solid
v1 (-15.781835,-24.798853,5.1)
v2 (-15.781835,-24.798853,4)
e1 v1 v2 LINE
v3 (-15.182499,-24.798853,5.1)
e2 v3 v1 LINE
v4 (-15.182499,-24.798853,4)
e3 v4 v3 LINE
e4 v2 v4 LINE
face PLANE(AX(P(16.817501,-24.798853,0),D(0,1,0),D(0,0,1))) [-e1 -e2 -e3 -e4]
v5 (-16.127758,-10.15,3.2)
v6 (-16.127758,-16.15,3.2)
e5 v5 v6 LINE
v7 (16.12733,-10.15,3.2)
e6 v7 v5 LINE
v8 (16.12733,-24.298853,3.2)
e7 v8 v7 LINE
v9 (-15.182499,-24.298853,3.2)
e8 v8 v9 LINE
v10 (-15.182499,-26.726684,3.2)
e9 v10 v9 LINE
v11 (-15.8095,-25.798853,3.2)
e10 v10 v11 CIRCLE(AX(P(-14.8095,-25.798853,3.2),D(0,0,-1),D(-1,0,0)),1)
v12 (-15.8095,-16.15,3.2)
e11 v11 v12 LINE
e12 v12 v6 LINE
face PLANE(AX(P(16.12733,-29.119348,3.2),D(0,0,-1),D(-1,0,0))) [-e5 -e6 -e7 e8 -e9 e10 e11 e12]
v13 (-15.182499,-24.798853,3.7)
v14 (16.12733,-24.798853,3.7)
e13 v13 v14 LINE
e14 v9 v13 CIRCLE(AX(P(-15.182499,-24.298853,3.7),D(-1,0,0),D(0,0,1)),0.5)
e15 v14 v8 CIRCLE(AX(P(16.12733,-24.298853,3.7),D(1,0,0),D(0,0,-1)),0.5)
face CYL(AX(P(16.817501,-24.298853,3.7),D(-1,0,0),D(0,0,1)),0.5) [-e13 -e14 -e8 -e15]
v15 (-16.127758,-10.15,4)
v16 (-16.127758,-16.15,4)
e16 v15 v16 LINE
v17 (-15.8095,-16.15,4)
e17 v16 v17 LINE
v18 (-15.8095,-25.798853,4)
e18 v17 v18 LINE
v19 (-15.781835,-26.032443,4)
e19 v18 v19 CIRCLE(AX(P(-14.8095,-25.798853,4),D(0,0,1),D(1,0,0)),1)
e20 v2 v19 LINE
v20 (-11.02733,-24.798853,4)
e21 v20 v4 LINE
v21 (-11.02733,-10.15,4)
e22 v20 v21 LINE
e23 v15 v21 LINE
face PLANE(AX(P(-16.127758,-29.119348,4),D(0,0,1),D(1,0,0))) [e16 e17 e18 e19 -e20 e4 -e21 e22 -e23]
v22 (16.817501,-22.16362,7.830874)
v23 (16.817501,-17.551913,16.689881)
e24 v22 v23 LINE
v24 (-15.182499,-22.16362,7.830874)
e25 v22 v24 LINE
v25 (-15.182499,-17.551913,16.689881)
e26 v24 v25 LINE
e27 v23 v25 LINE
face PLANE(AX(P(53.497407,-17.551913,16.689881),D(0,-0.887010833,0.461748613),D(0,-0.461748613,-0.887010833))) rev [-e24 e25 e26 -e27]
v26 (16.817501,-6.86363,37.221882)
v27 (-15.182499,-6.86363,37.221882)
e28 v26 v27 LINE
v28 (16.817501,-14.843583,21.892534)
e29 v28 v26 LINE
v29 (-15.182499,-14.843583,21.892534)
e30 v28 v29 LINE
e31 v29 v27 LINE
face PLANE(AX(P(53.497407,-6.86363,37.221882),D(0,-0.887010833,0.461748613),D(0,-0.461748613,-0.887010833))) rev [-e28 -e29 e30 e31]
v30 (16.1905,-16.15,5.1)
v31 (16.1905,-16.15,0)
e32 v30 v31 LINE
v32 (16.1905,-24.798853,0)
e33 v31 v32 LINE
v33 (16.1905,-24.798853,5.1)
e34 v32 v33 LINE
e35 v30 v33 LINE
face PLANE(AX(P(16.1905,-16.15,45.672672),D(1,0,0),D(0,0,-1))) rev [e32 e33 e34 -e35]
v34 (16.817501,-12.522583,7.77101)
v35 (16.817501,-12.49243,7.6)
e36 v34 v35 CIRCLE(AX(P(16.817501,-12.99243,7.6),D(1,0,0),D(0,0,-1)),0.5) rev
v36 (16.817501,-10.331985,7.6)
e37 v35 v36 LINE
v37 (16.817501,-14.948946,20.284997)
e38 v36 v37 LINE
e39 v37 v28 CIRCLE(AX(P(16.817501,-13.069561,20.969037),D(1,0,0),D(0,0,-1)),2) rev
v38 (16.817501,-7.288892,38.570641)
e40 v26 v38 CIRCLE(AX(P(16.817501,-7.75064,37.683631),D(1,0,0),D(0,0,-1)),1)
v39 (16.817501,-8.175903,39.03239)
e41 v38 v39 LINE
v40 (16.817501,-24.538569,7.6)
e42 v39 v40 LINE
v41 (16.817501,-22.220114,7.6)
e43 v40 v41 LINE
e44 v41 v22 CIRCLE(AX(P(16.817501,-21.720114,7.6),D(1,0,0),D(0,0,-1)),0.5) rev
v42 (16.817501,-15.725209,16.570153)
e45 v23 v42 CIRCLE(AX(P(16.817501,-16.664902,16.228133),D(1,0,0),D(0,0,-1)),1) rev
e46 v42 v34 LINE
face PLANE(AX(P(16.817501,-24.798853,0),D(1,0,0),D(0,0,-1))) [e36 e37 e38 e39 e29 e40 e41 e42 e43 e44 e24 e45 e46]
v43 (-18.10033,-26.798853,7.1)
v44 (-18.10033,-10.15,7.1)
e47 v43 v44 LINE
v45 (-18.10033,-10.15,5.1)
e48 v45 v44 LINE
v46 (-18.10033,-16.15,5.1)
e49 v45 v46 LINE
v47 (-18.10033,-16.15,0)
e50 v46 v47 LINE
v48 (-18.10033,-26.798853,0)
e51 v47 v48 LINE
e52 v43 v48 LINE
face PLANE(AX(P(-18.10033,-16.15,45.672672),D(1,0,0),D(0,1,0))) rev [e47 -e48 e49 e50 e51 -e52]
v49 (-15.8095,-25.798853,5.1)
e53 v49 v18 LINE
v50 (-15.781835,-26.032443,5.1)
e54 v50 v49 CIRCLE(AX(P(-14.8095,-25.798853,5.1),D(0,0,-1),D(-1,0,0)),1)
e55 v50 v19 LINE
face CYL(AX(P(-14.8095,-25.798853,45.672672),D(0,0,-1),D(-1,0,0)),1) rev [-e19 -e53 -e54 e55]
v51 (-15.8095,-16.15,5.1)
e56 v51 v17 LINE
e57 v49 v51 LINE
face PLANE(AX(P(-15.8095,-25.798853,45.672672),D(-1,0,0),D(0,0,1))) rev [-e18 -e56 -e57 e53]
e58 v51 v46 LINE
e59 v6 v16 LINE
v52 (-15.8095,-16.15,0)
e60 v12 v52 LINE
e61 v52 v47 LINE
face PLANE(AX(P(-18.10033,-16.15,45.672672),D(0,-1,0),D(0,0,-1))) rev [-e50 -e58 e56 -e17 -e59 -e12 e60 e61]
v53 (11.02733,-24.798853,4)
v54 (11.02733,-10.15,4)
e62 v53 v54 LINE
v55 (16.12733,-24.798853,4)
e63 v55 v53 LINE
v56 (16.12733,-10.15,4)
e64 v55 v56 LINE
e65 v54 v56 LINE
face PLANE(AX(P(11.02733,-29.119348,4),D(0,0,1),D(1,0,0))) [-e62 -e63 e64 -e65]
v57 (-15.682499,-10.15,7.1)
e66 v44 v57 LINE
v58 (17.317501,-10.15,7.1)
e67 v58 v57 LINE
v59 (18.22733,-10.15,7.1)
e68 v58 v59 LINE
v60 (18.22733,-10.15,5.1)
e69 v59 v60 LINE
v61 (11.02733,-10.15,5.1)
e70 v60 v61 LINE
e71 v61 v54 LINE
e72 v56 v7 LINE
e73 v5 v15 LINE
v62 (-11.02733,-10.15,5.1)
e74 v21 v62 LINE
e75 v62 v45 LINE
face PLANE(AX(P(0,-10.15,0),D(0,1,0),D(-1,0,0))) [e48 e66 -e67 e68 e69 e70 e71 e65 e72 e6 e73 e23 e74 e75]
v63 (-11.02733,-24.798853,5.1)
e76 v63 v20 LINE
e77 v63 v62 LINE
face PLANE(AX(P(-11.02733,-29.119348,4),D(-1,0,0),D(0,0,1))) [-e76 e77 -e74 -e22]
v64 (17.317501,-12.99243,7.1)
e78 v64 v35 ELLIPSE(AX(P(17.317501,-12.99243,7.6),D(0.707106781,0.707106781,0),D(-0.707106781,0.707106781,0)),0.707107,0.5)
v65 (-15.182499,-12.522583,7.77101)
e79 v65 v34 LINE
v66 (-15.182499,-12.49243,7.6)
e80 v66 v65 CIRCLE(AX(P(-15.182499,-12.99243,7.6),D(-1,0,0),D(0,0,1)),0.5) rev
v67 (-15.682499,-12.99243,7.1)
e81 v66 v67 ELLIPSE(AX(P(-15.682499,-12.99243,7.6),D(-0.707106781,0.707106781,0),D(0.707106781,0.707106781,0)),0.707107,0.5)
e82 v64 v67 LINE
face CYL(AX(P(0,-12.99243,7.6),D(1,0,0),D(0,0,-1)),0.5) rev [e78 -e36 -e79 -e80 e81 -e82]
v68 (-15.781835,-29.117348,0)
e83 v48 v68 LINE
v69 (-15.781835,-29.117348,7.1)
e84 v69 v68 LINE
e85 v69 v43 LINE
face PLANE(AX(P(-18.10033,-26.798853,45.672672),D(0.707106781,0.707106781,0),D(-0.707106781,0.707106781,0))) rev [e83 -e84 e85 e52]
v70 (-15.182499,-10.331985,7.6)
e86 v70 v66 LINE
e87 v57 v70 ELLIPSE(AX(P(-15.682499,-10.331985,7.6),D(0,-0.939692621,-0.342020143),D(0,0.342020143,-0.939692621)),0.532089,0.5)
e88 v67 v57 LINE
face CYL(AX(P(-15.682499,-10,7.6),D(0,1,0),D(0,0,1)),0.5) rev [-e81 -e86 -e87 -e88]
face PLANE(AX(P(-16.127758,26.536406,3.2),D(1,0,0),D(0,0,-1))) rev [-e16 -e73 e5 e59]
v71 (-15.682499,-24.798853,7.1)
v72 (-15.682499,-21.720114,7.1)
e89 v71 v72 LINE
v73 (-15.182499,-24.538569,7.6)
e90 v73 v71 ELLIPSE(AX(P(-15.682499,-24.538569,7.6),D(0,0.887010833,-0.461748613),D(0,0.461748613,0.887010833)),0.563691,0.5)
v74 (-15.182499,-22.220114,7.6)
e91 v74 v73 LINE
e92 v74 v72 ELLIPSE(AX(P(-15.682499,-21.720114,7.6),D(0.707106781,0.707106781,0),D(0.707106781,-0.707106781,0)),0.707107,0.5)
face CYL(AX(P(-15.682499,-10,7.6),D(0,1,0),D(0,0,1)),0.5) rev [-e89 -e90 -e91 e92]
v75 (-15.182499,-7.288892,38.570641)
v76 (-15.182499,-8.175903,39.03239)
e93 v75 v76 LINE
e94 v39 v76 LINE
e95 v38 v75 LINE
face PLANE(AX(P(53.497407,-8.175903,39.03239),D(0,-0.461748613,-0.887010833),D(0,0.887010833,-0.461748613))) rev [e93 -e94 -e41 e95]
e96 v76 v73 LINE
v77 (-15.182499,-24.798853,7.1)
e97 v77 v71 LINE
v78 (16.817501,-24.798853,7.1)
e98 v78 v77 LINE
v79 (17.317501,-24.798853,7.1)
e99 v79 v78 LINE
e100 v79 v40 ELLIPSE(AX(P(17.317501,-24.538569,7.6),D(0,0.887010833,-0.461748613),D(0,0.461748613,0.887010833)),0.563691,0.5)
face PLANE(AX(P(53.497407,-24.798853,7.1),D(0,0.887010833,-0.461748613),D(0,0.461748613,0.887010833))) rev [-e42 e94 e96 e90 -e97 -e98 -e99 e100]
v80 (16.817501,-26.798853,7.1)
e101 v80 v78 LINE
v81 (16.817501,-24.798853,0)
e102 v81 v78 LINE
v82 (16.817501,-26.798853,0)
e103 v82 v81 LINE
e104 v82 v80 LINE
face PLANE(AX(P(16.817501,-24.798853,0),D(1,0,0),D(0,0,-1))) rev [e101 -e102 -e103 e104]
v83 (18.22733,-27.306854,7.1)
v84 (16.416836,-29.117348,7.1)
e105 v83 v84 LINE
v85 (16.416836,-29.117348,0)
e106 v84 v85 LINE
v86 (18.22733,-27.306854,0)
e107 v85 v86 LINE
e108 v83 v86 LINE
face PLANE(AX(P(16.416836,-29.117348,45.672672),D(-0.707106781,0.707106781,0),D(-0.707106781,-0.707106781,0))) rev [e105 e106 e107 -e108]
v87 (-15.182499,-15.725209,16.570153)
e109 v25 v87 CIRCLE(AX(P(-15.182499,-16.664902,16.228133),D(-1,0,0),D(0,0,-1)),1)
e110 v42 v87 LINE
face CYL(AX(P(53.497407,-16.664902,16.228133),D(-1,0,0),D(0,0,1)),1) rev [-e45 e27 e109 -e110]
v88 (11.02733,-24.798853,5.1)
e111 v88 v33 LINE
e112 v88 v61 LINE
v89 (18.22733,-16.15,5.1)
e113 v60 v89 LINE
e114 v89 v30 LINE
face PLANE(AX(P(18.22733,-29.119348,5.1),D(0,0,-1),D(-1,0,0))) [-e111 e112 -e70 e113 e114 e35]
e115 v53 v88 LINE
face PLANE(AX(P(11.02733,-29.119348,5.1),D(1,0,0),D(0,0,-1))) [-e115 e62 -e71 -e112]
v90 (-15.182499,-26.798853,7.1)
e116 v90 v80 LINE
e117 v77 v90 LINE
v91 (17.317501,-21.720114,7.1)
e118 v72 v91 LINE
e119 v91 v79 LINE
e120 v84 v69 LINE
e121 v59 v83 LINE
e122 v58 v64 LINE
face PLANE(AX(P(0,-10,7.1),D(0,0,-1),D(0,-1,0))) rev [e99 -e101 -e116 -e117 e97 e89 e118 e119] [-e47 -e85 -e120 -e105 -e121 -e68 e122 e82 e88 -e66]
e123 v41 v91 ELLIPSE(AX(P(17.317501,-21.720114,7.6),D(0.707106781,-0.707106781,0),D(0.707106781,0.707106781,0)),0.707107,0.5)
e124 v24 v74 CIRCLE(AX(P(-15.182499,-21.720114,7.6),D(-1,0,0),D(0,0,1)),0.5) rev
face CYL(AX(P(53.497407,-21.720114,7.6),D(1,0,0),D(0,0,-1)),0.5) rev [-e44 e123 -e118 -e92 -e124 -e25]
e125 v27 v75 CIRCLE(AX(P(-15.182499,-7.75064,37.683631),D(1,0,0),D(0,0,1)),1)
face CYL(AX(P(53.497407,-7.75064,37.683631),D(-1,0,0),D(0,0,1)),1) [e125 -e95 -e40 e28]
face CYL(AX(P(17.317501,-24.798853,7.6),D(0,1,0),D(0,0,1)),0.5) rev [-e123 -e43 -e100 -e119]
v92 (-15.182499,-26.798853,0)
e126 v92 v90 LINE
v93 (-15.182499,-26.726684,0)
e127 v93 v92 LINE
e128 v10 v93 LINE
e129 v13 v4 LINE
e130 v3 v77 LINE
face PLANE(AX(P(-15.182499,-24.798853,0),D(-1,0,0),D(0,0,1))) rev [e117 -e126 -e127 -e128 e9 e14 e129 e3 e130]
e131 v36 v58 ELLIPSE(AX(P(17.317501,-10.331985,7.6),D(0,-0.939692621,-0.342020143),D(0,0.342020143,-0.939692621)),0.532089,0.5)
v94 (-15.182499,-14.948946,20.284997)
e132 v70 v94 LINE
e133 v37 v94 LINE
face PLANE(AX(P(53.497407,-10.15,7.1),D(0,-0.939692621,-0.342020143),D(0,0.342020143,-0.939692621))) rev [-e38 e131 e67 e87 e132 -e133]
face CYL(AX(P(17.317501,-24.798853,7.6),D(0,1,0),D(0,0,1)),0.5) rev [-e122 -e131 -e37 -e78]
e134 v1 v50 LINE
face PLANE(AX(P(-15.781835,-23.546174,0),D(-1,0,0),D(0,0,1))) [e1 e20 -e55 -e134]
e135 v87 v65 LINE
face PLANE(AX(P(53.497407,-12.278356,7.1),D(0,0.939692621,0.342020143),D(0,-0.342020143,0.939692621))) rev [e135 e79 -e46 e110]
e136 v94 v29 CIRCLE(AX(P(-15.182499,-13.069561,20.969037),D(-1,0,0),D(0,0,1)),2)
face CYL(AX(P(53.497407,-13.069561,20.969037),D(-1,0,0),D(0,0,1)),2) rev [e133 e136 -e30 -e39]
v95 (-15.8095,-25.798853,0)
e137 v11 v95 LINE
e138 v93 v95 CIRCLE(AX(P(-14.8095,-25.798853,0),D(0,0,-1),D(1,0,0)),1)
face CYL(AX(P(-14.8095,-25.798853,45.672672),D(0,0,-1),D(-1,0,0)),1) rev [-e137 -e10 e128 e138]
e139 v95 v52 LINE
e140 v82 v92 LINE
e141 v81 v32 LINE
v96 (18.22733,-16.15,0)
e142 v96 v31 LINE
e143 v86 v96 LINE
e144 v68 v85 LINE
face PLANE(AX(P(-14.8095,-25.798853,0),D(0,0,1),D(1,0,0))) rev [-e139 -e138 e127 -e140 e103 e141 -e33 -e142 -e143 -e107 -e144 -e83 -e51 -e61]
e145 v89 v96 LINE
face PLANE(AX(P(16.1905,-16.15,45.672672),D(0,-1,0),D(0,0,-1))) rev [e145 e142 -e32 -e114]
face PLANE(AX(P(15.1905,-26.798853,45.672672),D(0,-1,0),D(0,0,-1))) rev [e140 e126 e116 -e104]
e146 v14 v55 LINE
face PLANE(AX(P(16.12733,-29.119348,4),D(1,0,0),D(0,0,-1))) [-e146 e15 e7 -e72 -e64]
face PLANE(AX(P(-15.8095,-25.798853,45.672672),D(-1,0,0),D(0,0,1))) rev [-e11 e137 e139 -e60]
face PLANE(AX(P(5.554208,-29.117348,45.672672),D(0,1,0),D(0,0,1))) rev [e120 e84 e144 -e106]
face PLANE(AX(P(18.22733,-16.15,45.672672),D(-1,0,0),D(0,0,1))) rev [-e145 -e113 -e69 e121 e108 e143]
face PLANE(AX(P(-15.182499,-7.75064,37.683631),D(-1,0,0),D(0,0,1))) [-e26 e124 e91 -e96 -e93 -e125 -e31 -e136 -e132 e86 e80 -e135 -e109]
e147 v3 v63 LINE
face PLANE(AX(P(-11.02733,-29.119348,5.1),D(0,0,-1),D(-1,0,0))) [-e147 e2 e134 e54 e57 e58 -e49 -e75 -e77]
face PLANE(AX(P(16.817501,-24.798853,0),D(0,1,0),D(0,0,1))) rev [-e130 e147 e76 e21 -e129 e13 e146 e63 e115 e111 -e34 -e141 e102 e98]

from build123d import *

# Parameters (mm, degrees)
EXTRUDE_1_DEPTH             = 7.1
EXTRUDE_2_DEPTH             = 6
EXTRUDE_2_DIRECTION_2_REACH = 25.469
SKETCH_3_W                  = 32
SKETCH_3_H                  = 2
CUT_EXTRUDE_1_DEPTH         = 36.077992299
SKETCH_4_W                  = 0.599335356
SKETCH_4_H                  = 1.1
EXTRUDE_3_DEPTH             = 4.31849548
EXTRUDE_4_DEPTH             = 32
FILLET_1_R                  = 0.5


with BuildPart() as part:
    # 草图1 → 凸台-拉伸1 (new body)
    with BuildSketch(Plane.XY):
        with BuildLine():
            Line((18.227330455, -16.15), (18.227330455, -27.306853771))
            Line((18.227330455, -27.306853771), (16.416835991, -29.117348235))
            Line((16.416835991, -29.117348235), (5.554207951, -29.117348235))
            Line((5.554207951, -29.117348235), (-15.781834721, -29.117348235))
            Line((-15.781834721, -29.117348235), (-18.100330201, -26.798852755))
            Line((-18.100330201, -26.798852755), (-18.100330201, -16.15))
            Line((-18.100330201, -16.15), (-15.809499619, -16.15))
            Line((-15.809499619, -16.15), (-15.809499619, -25.798852755))
            ThreePointArc((-15.809499619, -25.798852755), (-15.5166064, -26.505959536), (-14.809499619, -26.798852755))
            Line((-14.809499619, -26.798852755), (15.190500381, -26.798852755))
            ThreePointArc((15.190500381, -26.798852755), (15.897607162, -26.505959536), (16.190500381, -25.798852755))
            Line((16.190500381, -25.798852755), (16.190500381, -16.15))
            Line((16.190500381, -16.15), (18.227330455, -16.15))
        make_face()
    extrude(amount=EXTRUDE_1_DEPTH)

    # 草图2 → 凸台-拉伸2 (add)
    with BuildSketch(Plane(origin=(0, -16.15, 0), x_dir=(1, 0, 0), z_dir=(0, 1, 0))):
        Polygon((16.127330455, -4.000000069), (16.127330455, -3.200000069), (-16.127758191, -3.200000069), (-16.127758191, -4), (-11.027330455, -4), (-11.027330455, -5.1), (-18.100330201, -5.1), (-18.100330201, -7.1), (18.227330455, -7.1), (18.227330455, -5.100000069), (11.027330455, -5.100000069), (11.027330455, -4.000000069), align=None)
    extrude(amount=EXTRUDE_2_DEPTH)

    # 草图2 → 凸台-拉伸2 direction 2 (add, up to next)
    with BuildSketch(Plane(origin=(0, -16.15, 0), x_dir=(1, 0, 0), z_dir=(0, 1, 0)), mode=Mode.PRIVATE) as extrude_2_direction_2_sk1:
        Polygon((16.127330455, -4.000000069), (16.127330455, -3.200000069), (-16.127758191, -3.200000069), (-16.127758191, -4), (-11.027330455, -4), (-11.027330455, -5.1), (-18.100330201, -5.1), (-18.100330201, -7.1), (18.227330455, -7.1), (18.227330455, -5.100000069), (11.027330455, -5.100000069), (11.027330455, -4.000000069), align=None)
    extrude_2_direction_2_tool1 = extrude(extrude_2_direction_2_sk1.sketch, amount=-EXTRUDE_2_DIRECTION_2_REACH, mode=Mode.PRIVATE) - part.part
    add(extrude_2_direction_2_tool1.solids().sort_by_distance((0.03755, -16.15, 5.267913))[0])

    # 草图3 → 切除-拉伸1 (cut, through all)
    with BuildSketch(Plane.XY.offset(7.1)):
        with Locations((0.817500635, -25.798852755)):
            Rectangle(SKETCH_3_W, SKETCH_3_H)
    extrude(amount=-CUT_EXTRUDE_1_DEPTH, mode=Mode.SUBTRACT)

    # 草图4 → 凸台-拉伸3 (add)
    with BuildSketch(Plane.XZ.offset(29.117348235)):
        with Locations((-15.482167043, 4.55)):
            Rectangle(SKETCH_4_W, SKETCH_4_H)
    extrude(amount=-EXTRUDE_3_DEPTH)

    # 草图5 → 凸台-拉伸4 (add)
    with BuildSketch(Plane(origin=(-15.182499365, 0, 0), x_dir=(0, 0, -1), z_dir=(1, 0, 0))):
        with BuildLine():
            Line((-7.1, -24.798852755), (-39.032389994, -8.175902679))
            Line((-39.032389994, -8.175902679), (-38.570641381, -7.288891846))
            ThreePointArc((-38.570641381, -7.288891846), (-37.984336348, -6.796923508), (-37.221881935, -6.863629626))
            Line((-37.221881935, -6.863629626), (-21.892534432, -14.843582842))
            ThreePointArc((-21.892534432, -14.843582842), (-21.099843464, -15.065279022), (-20.284996919, -14.948946417))
            Line((-20.284996919, -14.948946417), (-7.1, -10.15))
            Line((-7.1, -10.15), (-7.1, -12.278355545))
            Line((-7.1, -12.278355545), (-16.570152711, -15.725209246))
            ThreePointArc((-16.570152711, -15.725209246), (-17.225991491, -16.599498737), (-16.689881181, -17.5519127))
            Line((-16.689881181, -17.5519127), (-7.1, -22.544088861))
            Line((-7.1, -22.544088861), (-7.1, -24.798852755))
        make_face()
    extrude(amount=EXTRUDE_4_DEPTH)

    # 圆角1
    # the kernel refuses this fillet: 0.5 mm, written as the material it adds along each edge
    with BuildSketch(Plane(origin=(-15.182499365, -21.294088861, 7.1), x_dir=(-1, 0, 0), z_dir=(0, -1, 0))) as fillet_1_piece_1_section:
        with BuildLine():
            CenterArc((FILLET_1_R, -FILLET_1_R), FILLET_1_R, 90, 90)
            Line((0, -FILLET_1_R), (-FILLET_1_R * 0.02, -FILLET_1_R))
            Line((-FILLET_1_R * 0.02, -FILLET_1_R), (-FILLET_1_R * 0.02, FILLET_1_R * 0.02))
            Line((-FILLET_1_R * 0.02, FILLET_1_R * 0.02), (FILLET_1_R, FILLET_1_R * 0.02))
            Line((FILLET_1_R, FILLET_1_R * 0.02), (FILLET_1_R, 0))
        make_face()
    fillet_1_piece_1 = extrude(amount=4.754763894, mode=Mode.PRIVATE)
    fillet_1_piece_1 = split(fillet_1_piece_1, bisect_by=Plane(origin=(-15.182499365, -23.618510105, 7.201736565), z_dir=(-1, 0, 0)), keep=Keep.TOP, mode=Mode.PRIVATE)
    fillet_1_piece_1 = split(fillet_1_piece_1, bisect_by=Plane(origin=(-15.30597489, -24.505520938, 7.663485178), z_dir=(0, 0.8870108331782195, -0.46174861323503813)), keep=Keep.TOP, mode=Mode.PRIVATE)
    fillet_1_piece_1 = split(fillet_1_piece_1, bisect_by=Plane(origin=(-15.30597489, -22.731499272, 6.739987952), z_dir=(0, -0.8870108331782195, 0.4617486132350387)), keep=Keep.TOP, mode=Mode.PRIVATE)
    add(fillet_1_piece_1)
    with BuildSketch(Plane(origin=(-15.182499365, -22.544088861, 7.1), x_dir=(0, 1, 0), z_dir=(1, 0, 0))) as fillet_1_piece_2:
        with BuildLine():
            CenterArc((FILLET_1_R * 1.64794899742, FILLET_1_R), FILLET_1_R, 152.5, 117.5)
            Line((FILLET_1_R * 0.76093816424, FILLET_1_R * 1.46174861324), (FILLET_1_R * 0.743197947576, FILLET_1_R * 1.4709835855))
            Line((FILLET_1_R * 0.743197947576, FILLET_1_R * 1.4709835855), (-FILLET_1_R * 0.0329589799484, -FILLET_1_R * 0.02))
            Line((-FILLET_1_R * 0.0329589799484, -FILLET_1_R * 0.02), (FILLET_1_R * 1.64794899742, -FILLET_1_R * 0.02))
            Line((FILLET_1_R * 1.64794899742, -FILLET_1_R * 0.02), (FILLET_1_R * 1.64794899742, 0))
        make_face()
    extrude(amount=32)
    with BuildSketch(Plane(origin=(-15.182499365, -12.278355545, 7.1), x_dir=(0, -1, 0), z_dir=(1, 0, 0))) as fillet_1_piece_3:
        with BuildLine():
            CenterArc((FILLET_1_R * 1.42814800674, -FILLET_1_R), FILLET_1_R, 90, 110)
            Line((FILLET_1_R * 0.488455385956, -FILLET_1_R * 1.34202014333), (FILLET_1_R * 0.46966153354, -FILLET_1_R * 1.34886054619))
            Line((FILLET_1_R * 0.46966153354, -FILLET_1_R * 1.34886054619), (-FILLET_1_R * 0.0285629601348, FILLET_1_R * 0.02))
            Line((-FILLET_1_R * 0.0285629601348, FILLET_1_R * 0.02), (FILLET_1_R * 1.42814800674, FILLET_1_R * 0.02))
            Line((FILLET_1_R * 1.42814800674, FILLET_1_R * 0.02), (FILLET_1_R * 1.42814800674, 0))
        make_face()
    extrude(amount=32)
    with BuildSketch(Plane(origin=(-15.182499365, -10.15, 7.1), x_dir=(-1, 0, 0), z_dir=(0, -1, 0))) as fillet_1_piece_4_section:
        with BuildLine():
            CenterArc((FILLET_1_R, -FILLET_1_R), FILLET_1_R, 90, 90)
            Line((0, -FILLET_1_R), (-FILLET_1_R * 0.02, -FILLET_1_R))
            Line((-FILLET_1_R * 0.02, -FILLET_1_R), (-FILLET_1_R * 0.02, FILLET_1_R * 0.02))
            Line((-FILLET_1_R * 0.02, FILLET_1_R * 0.02), (FILLET_1_R, FILLET_1_R * 0.02))
            Line((FILLET_1_R, FILLET_1_R * 0.02), (FILLET_1_R, 0))
        make_face()
    fillet_1_piece_4 = extrude(amount=3.378355545, mode=Mode.PRIVATE)
    fillet_1_piece_4 = split(fillet_1_piece_4, bisect_by=Plane(origin=(-15.295687906, -12.195082425, 6.871208984), z_dir=(0, 0.9396926207859094, 0.34202014332566616)), keep=Keep.TOP, mode=Mode.PRIVATE)
    fillet_1_piece_4 = split(fillet_1_piece_4, bisect_by=Plane(origin=(-15.295687906, -10.315697184, 7.55524927), z_dir=(0, -0.9396926207859093, -0.34202014332566627)), keep=Keep.TOP, mode=Mode.PRIVATE)
    add(fillet_1_piece_4)
    with BuildSketch(Plane(origin=(16.817500635, -21.294088861, 7.1), x_dir=(1, 0, 0), z_dir=(0, -1, 0))) as fillet_1_piece_5_section:
        with BuildLine():
            CenterArc((FILLET_1_R, FILLET_1_R), FILLET_1_R, 180, 90)
            Line((0, FILLET_1_R), (-FILLET_1_R * 0.02, FILLET_1_R))
            Line((-FILLET_1_R * 0.02, FILLET_1_R), (-FILLET_1_R * 0.02, -FILLET_1_R * 0.02))
            Line((-FILLET_1_R * 0.02, -FILLET_1_R * 0.02), (FILLET_1_R, -FILLET_1_R * 0.02))
            Line((FILLET_1_R, -FILLET_1_R * 0.02), (FILLET_1_R, 0))
        make_face()
    fillet_1_piece_5 = extrude(amount=4.754763894, mode=Mode.PRIVATE)
    fillet_1_piece_5 = split(fillet_1_piece_5, bisect_by=Plane(origin=(16.817500635, -23.618510105, 7.201736565), z_dir=(1, 0, 0)), keep=Keep.TOP, mode=Mode.PRIVATE)
    fillet_1_piece_5 = split(fillet_1_piece_5, bisect_by=Plane(origin=(16.94097616, -24.505520938, 7.663485178), z_dir=(0, 0.8870108331782195, -0.46174861323503813)), keep=Keep.TOP, mode=Mode.PRIVATE)
    fillet_1_piece_5 = split(fillet_1_piece_5, bisect_by=Plane(origin=(16.94097616, -22.731499272, 6.739987952), z_dir=(0, -0.8870108331782195, 0.4617486132350387)), keep=Keep.TOP, mode=Mode.PRIVATE)
    add(fillet_1_piece_5)
    with BuildSketch(Plane(origin=(16.817500635, -10.15, 7.1), x_dir=(1, 0, 0), z_dir=(0, -1, 0))) as fillet_1_piece_6_section:
        with BuildLine():
            CenterArc((FILLET_1_R, FILLET_1_R), FILLET_1_R, 180, 90)
            Line((0, FILLET_1_R), (-FILLET_1_R * 0.02, FILLET_1_R))
            Line((-FILLET_1_R * 0.02, FILLET_1_R), (-FILLET_1_R * 0.02, -FILLET_1_R * 0.02))
            Line((-FILLET_1_R * 0.02, -FILLET_1_R * 0.02), (FILLET_1_R, -FILLET_1_R * 0.02))
            Line((FILLET_1_R, -FILLET_1_R * 0.02), (FILLET_1_R, 0))
        make_face()
    fillet_1_piece_6 = extrude(amount=3.378355545, mode=Mode.PRIVATE)
    fillet_1_piece_6 = split(fillet_1_piece_6, bisect_by=Plane(origin=(16.930689176, -10.315697184, 7.55524927), z_dir=(0, -0.9396926207859093, -0.34202014332566627)), keep=Keep.TOP, mode=Mode.PRIVATE)
    fillet_1_piece_6 = split(fillet_1_piece_6, bisect_by=Plane(origin=(16.930689176, -12.195082425, 6.871208984), z_dir=(0, 0.9396926207859094, 0.34202014332566616)), keep=Keep.TOP, mode=Mode.PRIVATE)
    add(fillet_1_piece_6)
    with BuildSketch(Plane(origin=(-15.182499365, -21.294088861, 7.1), x_dir=(-1, 0, 0), z_dir=(0, -1, 0))) as fillet_1_piece_7a_section:
        with BuildLine():
            CenterArc((FILLET_1_R, -FILLET_1_R), FILLET_1_R, 90, 90)
            Line((0, -FILLET_1_R), (-FILLET_1_R * 0.02, -FILLET_1_R))
            Line((-FILLET_1_R * 0.02, -FILLET_1_R), (-FILLET_1_R * 0.02, FILLET_1_R * 0.02))
            Line((-FILLET_1_R * 0.02, FILLET_1_R * 0.02), (FILLET_1_R, FILLET_1_R * 0.02))
            Line((FILLET_1_R, FILLET_1_R * 0.02), (FILLET_1_R, 0))
        make_face()
    fillet_1_piece_7a = extrude(amount=4.754763894, mode=Mode.PRIVATE)
    fillet_1_piece_7a = split(fillet_1_piece_7a, bisect_by=Plane(origin=(-15.182499365, -21.893638872, 7.197777948), z_dir=(-1, 0, 0)), keep=Keep.TOP, mode=Mode.PRIVATE)
    fillet_1_piece_7a = split(fillet_1_piece_7a, bisect_by=Plane(origin=(-15.308579206, -22.365357757, 7.443339257), z_dir=(0, 0.8870108331782195, -0.4617486132350387)), keep=Keep.TOP, mode=Mode.PRIVATE)
    with BuildSketch(Plane(origin=(-17.242435612, -22.544088861, 7.1), x_dir=(0, 1, 0), z_dir=(1, 0, 0))) as fillet_1_piece_7b_section:
        with BuildLine():
            CenterArc((FILLET_1_R * 1.64794899742, FILLET_1_R), FILLET_1_R, 152.5, 117.5)
            Line((FILLET_1_R * 0.76093816424, FILLET_1_R * 1.46174861324), (FILLET_1_R * 0.743197947576, FILLET_1_R * 1.4709835855))
            Line((FILLET_1_R * 0.743197947576, FILLET_1_R * 1.4709835855), (-FILLET_1_R * 0.0329589799484, -FILLET_1_R * 0.02))
            Line((-FILLET_1_R * 0.0329589799484, -FILLET_1_R * 0.02), (FILLET_1_R * 1.64794899742, -FILLET_1_R * 0.02))
            Line((FILLET_1_R * 1.64794899742, -FILLET_1_R * 0.02), (FILLET_1_R * 1.64794899742, 0))
        make_face()
    fillet_1_piece_7b = extrude(amount=34.059936247, mode=Mode.PRIVATE)
    fillet_1_piece_7b = split(fillet_1_piece_7b, bisect_by=Plane(origin=(-15.182499365, -22.251163965, 7.277751191), z_dir=(-1, 0, 0)), keep=Keep.TOP, mode=Mode.PRIVATE)
    fillet_1_piece_7 = fillet_1_piece_7a & fillet_1_piece_7b
    add(fillet_1_piece_7)
    with BuildSketch(Plane(origin=(-15.182499365, -22.544088861, 7.1), x_dir=(0, 1, 0), z_dir=(1, 0, 0))) as fillet_1_piece_8a_section:
        with BuildLine():
            CenterArc((FILLET_1_R * 1.64794899742, FILLET_1_R), FILLET_1_R, 152.5, 117.5)
            Line((FILLET_1_R * 0.76093816424, FILLET_1_R * 1.46174861324), (FILLET_1_R * 0.743197947576, FILLET_1_R * 1.4709835855))
            Line((FILLET_1_R * 0.743197947576, FILLET_1_R * 1.4709835855), (-FILLET_1_R * 0.0329589799484, -FILLET_1_R * 0.02))
            Line((-FILLET_1_R * 0.0329589799484, -FILLET_1_R * 0.02), (FILLET_1_R * 1.64794899742, -FILLET_1_R * 0.02))
            Line((FILLET_1_R * 1.64794899742, -FILLET_1_R * 0.02), (FILLET_1_R * 1.64794899742, 0))
        make_face()
    fillet_1_piece_8a = extrude(amount=34.059936247, mode=Mode.PRIVATE)
    fillet_1_piece_8a = split(fillet_1_piece_8a, bisect_by=Plane(origin=(16.817500635, -22.251163965, 7.277751191), z_dir=(1, 0, 0)), keep=Keep.TOP, mode=Mode.PRIVATE)
    with BuildSketch(Plane(origin=(16.817500635, -21.294088861, 7.1), x_dir=(1, 0, 0), z_dir=(0, -1, 0))) as fillet_1_piece_8b_section:
        with BuildLine():
            CenterArc((FILLET_1_R, FILLET_1_R), FILLET_1_R, 180, 90)
            Line((0, FILLET_1_R), (-FILLET_1_R * 0.02, FILLET_1_R))
            Line((-FILLET_1_R * 0.02, FILLET_1_R), (-FILLET_1_R * 0.02, -FILLET_1_R * 0.02))
            Line((-FILLET_1_R * 0.02, -FILLET_1_R * 0.02), (FILLET_1_R, -FILLET_1_R * 0.02))
            Line((FILLET_1_R, -FILLET_1_R * 0.02), (FILLET_1_R, 0))
        make_face()
    fillet_1_piece_8b = extrude(amount=4.754763894, mode=Mode.PRIVATE)
    fillet_1_piece_8b = split(fillet_1_piece_8b, bisect_by=Plane(origin=(16.817500635, -21.893638872, 7.197777948), z_dir=(1, 0, 0)), keep=Keep.TOP, mode=Mode.PRIVATE)
    fillet_1_piece_8b = split(fillet_1_piece_8b, bisect_by=Plane(origin=(16.943580476, -22.365357757, 7.443339257), z_dir=(0, 0.8870108331782195, -0.4617486132350387)), keep=Keep.TOP, mode=Mode.PRIVATE)
    fillet_1_piece_8 = fillet_1_piece_8a & fillet_1_piece_8b
    add(fillet_1_piece_8)
    with BuildSketch(Plane(origin=(-16.967684373, -12.278355545, 7.1), x_dir=(0, -1, 0), z_dir=(1, 0, 0))) as fillet_1_piece_9a_section:
        with BuildLine():
            CenterArc((FILLET_1_R * 1.42814800674, -FILLET_1_R), FILLET_1_R, 90, 110)
            Line((FILLET_1_R * 0.488455385956, -FILLET_1_R * 1.34202014333), (FILLET_1_R * 0.46966153354, -FILLET_1_R * 1.34886054619))
            Line((FILLET_1_R * 0.46966153354, -FILLET_1_R * 1.34886054619), (-FILLET_1_R * 0.0285629601348, FILLET_1_R * 0.02))
            Line((-FILLET_1_R * 0.0285629601348, FILLET_1_R * 0.02), (FILLET_1_R * 1.42814800674, FILLET_1_R * 0.02))
            Line((FILLET_1_R * 1.42814800674, FILLET_1_R * 0.02), (FILLET_1_R * 1.42814800674, 0))
        make_face()
    fillet_1_piece_9a = extrude(amount=33.785185008, mode=Mode.PRIVATE)
    fillet_1_piece_9a = split(fillet_1_piece_9a, bisect_by=Plane(origin=(-15.182499365, -12.506130836, 7.259489976), z_dir=(-1, 0, 0)), keep=Keep.TOP, mode=Mode.PRIVATE)
    with BuildSketch(Plane(origin=(-15.182499365, -10.15, 7.1), x_dir=(-1, 0, 0), z_dir=(0, -1, 0))) as fillet_1_piece_9b_section:
        with BuildLine():
            CenterArc((FILLET_1_R, -FILLET_1_R), FILLET_1_R, 90, 90)
            Line((0, -FILLET_1_R), (-FILLET_1_R * 0.02, -FILLET_1_R))
            Line((-FILLET_1_R * 0.02, -FILLET_1_R), (-FILLET_1_R * 0.02, FILLET_1_R * 0.02))
            Line((-FILLET_1_R * 0.02, FILLET_1_R * 0.02), (FILLET_1_R, FILLET_1_R * 0.02))
            Line((FILLET_1_R, FILLET_1_R * 0.02), (FILLET_1_R, 0))
        make_face()
    fillet_1_piece_9b = extrude(amount=3.378355545, mode=Mode.PRIVATE)
    fillet_1_piece_9b = split(fillet_1_piece_9b, bisect_by=Plane(origin=(-15.29776373, -12.389058539, 7.404153976), z_dir=(0, -0.9396926207859094, -0.34202014332566616)), keep=Keep.TOP, mode=Mode.PRIVATE)
    fillet_1_piece_9 = fillet_1_piece_9a & fillet_1_piece_9b
    add(fillet_1_piece_9)
    with BuildSketch(Plane(origin=(16.817500635, -10.15, 7.1), x_dir=(1, 0, 0), z_dir=(0, -1, 0))) as fillet_1_piece_10a_section:
        with BuildLine():
            CenterArc((FILLET_1_R, FILLET_1_R), FILLET_1_R, 180, 90)
            Line((0, FILLET_1_R), (-FILLET_1_R * 0.02, FILLET_1_R))
            Line((-FILLET_1_R * 0.02, FILLET_1_R), (-FILLET_1_R * 0.02, -FILLET_1_R * 0.02))
            Line((-FILLET_1_R * 0.02, -FILLET_1_R * 0.02), (FILLET_1_R, -FILLET_1_R * 0.02))
            Line((FILLET_1_R, -FILLET_1_R * 0.02), (FILLET_1_R, 0))
        make_face()
    fillet_1_piece_10a = extrude(amount=3.378355545, mode=Mode.PRIVATE)
    fillet_1_piece_10a = split(fillet_1_piece_10a, bisect_by=Plane(origin=(16.932765, -12.389058539, 7.404153976), z_dir=(0, -0.9396926207859094, -0.34202014332566616)), keep=Keep.TOP, mode=Mode.PRIVATE)
    with BuildSketch(Plane(origin=(-15.182499365, -12.278355545, 7.1), x_dir=(0, -1, 0), z_dir=(1, 0, 0))) as fillet_1_piece_10b_section:
        with BuildLine():
            CenterArc((FILLET_1_R * 1.42814800674, -FILLET_1_R), FILLET_1_R, 90, 110)
            Line((FILLET_1_R * 0.488455385956, -FILLET_1_R * 1.34202014333), (FILLET_1_R * 0.46966153354, -FILLET_1_R * 1.34886054619))
            Line((FILLET_1_R * 0.46966153354, -FILLET_1_R * 1.34886054619), (-FILLET_1_R * 0.0285629601348, FILLET_1_R * 0.02))
            Line((-FILLET_1_R * 0.0285629601348, FILLET_1_R * 0.02), (FILLET_1_R * 1.42814800674, FILLET_1_R * 0.02))
            Line((FILLET_1_R * 1.42814800674, FILLET_1_R * 0.02), (FILLET_1_R * 1.42814800674, 0))
        make_face()
    fillet_1_piece_10b = extrude(amount=33.785185008, mode=Mode.PRIVATE)
    fillet_1_piece_10b = split(fillet_1_piece_10b, bisect_by=Plane(origin=(16.817500635, -12.506130836, 7.259489976), z_dir=(1, 0, 0)), keep=Keep.TOP, mode=Mode.PRIVATE)
    fillet_1_piece_10 = fillet_1_piece_10a & fillet_1_piece_10b
    add(fillet_1_piece_10)
    # the kernel refuses this fillet: 0.5 mm, written as the material it takes off along each edge
    with BuildSketch(Plane(origin=(-15.182499365, -24.798852755, 3.200000069), x_dir=(0, 0, 1), z_dir=(1, 0, 0))) as fillet_1_2_piece_1:
        with BuildLine():
            CenterArc((FILLET_1_R, -FILLET_1_R), FILLET_1_R, 90, 90)
            Line((0, -FILLET_1_R), (-FILLET_1_R * 0.02, -FILLET_1_R))
            Line((-FILLET_1_R * 0.02, -FILLET_1_R), (-FILLET_1_R * 0.02, FILLET_1_R * 0.02))
            Line((-FILLET_1_R * 0.02, FILLET_1_R * 0.02), (FILLET_1_R, FILLET_1_R * 0.02))
            Line((FILLET_1_R, FILLET_1_R * 0.02), (FILLET_1_R, 0))
        make_face()
    extrude(amount=31.30982982, mode=Mode.SUBTRACT)


solid = part.part
